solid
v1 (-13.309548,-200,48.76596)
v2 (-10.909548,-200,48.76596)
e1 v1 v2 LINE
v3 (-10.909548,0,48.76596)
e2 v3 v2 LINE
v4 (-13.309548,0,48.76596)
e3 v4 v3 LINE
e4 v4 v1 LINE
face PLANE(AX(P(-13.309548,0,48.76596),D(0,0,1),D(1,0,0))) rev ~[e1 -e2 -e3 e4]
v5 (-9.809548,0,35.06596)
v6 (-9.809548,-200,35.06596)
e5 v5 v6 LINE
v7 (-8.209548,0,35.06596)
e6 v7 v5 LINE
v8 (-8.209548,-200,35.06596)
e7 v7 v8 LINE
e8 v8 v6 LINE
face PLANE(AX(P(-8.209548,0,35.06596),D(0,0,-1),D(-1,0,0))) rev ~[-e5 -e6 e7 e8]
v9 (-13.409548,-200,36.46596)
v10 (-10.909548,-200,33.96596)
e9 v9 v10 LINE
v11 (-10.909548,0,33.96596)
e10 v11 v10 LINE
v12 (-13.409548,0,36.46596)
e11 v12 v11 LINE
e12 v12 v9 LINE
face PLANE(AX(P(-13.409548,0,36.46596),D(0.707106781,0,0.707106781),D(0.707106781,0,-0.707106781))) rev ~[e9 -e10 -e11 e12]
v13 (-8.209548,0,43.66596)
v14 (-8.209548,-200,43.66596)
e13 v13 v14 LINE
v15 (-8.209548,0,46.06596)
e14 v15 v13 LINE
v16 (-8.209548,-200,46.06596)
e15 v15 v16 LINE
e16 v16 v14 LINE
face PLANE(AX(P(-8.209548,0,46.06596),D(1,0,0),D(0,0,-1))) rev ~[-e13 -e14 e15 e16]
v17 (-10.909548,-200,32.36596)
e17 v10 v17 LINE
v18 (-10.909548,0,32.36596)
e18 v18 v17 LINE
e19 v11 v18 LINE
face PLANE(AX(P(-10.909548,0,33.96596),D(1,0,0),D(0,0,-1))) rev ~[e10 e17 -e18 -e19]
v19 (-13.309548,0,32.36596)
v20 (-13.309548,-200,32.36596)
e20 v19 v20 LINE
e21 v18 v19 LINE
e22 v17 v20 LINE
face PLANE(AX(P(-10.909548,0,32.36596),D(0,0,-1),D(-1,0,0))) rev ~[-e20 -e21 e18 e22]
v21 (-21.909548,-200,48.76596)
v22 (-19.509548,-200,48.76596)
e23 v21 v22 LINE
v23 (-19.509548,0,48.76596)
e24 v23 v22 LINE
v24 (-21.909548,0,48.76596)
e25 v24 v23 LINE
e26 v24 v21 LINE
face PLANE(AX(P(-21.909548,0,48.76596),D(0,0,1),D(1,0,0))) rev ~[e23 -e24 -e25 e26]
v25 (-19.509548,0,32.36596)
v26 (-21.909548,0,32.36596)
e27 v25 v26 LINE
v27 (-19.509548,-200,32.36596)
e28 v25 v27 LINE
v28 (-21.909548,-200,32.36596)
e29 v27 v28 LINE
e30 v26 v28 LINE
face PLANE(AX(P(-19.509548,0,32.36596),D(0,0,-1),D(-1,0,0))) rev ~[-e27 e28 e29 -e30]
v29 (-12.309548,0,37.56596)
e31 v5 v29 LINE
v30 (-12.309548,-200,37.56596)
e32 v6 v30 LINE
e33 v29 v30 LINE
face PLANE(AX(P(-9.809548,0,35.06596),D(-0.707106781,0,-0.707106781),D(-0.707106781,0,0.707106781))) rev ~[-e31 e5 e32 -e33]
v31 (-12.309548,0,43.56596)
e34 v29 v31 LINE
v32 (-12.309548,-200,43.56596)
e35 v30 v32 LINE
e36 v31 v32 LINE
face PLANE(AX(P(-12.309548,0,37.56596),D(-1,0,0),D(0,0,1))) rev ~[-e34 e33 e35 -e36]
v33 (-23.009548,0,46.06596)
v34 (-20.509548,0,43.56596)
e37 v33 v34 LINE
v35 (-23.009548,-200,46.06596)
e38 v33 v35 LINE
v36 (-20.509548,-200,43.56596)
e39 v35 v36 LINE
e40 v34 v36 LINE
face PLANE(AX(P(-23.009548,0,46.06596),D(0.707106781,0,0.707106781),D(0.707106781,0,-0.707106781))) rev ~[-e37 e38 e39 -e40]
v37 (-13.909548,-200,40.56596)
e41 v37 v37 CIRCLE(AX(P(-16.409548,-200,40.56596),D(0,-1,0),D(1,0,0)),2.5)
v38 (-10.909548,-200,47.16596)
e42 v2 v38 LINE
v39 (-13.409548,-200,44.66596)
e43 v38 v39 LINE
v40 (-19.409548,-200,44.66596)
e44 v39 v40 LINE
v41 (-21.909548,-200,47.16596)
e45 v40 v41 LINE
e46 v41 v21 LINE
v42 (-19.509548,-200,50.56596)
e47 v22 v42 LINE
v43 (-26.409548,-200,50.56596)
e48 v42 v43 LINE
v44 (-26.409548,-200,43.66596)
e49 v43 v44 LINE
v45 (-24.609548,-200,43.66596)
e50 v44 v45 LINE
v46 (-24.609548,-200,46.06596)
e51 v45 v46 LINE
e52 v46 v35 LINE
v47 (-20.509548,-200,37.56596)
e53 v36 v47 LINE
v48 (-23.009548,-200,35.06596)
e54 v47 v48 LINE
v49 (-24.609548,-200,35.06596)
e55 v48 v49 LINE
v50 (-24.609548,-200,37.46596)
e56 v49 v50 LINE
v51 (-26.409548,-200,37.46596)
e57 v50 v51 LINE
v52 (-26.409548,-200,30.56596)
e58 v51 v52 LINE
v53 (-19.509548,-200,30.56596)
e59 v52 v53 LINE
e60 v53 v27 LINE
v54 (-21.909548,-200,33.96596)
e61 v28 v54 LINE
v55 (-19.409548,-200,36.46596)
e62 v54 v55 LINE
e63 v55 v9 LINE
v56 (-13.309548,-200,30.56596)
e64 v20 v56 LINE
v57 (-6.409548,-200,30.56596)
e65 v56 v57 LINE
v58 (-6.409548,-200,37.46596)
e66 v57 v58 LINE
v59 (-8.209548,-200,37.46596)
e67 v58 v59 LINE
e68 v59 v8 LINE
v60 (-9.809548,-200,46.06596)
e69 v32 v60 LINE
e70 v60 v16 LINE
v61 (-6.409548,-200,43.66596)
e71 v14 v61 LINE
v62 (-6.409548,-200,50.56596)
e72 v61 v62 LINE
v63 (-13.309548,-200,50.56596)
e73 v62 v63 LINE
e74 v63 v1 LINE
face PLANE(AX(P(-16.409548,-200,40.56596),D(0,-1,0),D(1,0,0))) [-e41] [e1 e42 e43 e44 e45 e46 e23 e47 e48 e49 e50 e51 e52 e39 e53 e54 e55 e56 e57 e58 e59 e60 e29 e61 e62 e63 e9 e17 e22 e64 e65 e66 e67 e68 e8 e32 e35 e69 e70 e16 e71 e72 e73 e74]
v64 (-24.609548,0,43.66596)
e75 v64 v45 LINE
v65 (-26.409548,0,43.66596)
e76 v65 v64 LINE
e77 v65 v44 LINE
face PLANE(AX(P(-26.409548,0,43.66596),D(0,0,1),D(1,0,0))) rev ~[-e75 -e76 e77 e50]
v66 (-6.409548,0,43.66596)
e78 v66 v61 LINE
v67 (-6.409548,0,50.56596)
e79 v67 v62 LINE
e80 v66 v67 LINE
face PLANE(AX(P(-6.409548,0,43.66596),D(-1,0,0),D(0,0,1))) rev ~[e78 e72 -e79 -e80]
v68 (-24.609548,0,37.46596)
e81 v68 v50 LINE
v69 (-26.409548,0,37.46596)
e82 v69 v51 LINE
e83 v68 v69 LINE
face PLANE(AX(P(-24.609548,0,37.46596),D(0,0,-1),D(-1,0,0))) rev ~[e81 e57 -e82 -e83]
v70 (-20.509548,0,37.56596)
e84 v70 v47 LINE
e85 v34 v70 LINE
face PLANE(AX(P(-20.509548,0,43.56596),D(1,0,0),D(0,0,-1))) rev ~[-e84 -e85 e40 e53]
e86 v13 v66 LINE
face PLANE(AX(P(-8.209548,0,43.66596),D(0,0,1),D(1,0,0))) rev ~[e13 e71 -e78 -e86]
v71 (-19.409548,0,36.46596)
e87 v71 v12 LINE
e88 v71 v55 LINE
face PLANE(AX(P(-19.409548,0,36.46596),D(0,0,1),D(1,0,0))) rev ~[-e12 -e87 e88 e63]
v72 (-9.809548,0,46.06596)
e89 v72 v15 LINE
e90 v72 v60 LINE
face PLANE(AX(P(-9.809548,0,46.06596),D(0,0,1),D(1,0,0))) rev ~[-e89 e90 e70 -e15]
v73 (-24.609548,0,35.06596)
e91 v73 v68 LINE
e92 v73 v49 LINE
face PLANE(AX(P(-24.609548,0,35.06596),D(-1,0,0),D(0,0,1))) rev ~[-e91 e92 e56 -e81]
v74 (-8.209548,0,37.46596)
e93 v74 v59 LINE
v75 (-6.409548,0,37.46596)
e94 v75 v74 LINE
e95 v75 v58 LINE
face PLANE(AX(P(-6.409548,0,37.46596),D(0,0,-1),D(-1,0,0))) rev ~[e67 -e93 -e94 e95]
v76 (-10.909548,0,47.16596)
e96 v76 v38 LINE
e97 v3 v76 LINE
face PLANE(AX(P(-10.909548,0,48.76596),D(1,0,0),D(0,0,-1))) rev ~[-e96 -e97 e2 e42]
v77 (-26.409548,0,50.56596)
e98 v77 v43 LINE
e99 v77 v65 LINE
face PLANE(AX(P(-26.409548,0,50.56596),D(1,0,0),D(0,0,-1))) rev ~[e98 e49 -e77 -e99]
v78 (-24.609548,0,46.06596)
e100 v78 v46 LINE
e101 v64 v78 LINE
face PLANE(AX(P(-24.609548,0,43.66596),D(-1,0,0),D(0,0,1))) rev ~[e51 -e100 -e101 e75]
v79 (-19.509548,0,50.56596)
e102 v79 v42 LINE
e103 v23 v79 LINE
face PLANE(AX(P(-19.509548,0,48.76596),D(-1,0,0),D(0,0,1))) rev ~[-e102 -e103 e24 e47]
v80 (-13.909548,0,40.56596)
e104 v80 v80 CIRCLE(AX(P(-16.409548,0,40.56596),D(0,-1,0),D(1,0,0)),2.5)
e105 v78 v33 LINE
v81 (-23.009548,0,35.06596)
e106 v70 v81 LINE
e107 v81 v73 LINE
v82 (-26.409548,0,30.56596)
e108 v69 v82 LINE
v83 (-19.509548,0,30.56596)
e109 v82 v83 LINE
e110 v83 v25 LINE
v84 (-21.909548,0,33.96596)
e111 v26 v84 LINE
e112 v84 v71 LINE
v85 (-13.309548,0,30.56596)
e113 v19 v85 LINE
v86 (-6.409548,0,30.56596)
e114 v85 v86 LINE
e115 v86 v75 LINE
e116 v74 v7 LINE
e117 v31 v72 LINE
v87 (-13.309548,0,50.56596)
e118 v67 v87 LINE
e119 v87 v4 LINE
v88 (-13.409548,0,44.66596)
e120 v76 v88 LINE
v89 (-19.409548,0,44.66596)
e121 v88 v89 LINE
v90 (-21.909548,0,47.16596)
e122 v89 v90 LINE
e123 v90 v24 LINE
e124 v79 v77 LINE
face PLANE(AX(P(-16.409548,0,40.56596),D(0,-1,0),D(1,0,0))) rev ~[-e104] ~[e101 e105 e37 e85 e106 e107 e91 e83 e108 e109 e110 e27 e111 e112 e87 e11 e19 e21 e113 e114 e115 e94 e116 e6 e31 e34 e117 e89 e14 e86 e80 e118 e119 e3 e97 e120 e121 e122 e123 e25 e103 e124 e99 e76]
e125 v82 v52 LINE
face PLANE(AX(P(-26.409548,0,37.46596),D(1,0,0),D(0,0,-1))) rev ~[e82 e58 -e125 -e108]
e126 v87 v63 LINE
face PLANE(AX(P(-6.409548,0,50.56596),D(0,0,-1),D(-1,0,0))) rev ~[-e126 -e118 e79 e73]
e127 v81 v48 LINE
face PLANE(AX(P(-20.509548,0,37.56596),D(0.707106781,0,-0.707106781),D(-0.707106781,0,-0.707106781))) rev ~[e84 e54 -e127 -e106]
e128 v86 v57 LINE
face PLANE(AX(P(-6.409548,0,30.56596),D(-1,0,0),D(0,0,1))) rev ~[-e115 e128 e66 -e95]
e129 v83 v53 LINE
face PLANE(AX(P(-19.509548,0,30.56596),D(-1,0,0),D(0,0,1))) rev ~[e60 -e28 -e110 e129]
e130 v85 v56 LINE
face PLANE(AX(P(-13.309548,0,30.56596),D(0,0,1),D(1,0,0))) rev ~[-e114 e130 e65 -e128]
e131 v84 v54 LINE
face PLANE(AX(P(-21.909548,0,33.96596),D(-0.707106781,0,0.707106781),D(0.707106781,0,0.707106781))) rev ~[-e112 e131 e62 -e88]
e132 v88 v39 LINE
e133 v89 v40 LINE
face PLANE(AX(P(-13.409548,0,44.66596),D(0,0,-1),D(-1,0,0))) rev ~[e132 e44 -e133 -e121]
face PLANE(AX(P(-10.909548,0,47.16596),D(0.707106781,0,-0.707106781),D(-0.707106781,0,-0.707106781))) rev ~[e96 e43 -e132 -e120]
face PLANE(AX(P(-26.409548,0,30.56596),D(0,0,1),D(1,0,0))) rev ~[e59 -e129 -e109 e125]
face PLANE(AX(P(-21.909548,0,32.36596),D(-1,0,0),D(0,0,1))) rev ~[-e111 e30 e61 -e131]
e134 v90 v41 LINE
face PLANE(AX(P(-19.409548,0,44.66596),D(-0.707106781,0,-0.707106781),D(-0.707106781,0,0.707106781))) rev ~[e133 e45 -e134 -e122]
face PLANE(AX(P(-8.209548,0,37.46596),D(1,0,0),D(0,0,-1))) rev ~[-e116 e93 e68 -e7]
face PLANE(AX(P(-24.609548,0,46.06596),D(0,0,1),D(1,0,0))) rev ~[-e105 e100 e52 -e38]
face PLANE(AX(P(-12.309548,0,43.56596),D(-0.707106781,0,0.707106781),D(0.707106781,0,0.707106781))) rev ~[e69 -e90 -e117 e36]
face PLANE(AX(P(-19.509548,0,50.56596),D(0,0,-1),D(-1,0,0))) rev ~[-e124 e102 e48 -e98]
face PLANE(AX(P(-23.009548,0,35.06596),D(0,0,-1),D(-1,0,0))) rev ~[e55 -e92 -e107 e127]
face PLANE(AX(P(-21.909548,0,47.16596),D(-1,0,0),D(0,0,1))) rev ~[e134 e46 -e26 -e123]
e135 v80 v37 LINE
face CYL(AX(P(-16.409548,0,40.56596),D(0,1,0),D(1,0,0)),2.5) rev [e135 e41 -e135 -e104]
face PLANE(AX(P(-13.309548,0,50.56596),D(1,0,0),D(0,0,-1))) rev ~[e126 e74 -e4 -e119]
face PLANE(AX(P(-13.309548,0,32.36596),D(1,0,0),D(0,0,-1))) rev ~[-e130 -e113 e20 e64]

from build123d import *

# Parameters (mm, degrees)
F0_R     = 2.5
F1_DEPTH = 200


# Not quite as in the source:
# - a feature names something its author has since deleted; it is built from what else it names


with BuildPart() as f1:
    # F0 (on Front) → F1 (new body)
    with BuildSketch(Plane.XZ):
        Polygon((-19.5095479995, 50.5659601092), (-26.4095479995, 50.5659601092), (-26.4095479995, 43.6659601092), (-24.6095479995, 43.6659601092), (-24.6095479995, 46.0659601092), (-23.0095479995, 46.0659601092), (-20.5095479995, 43.5659601092), (-20.5095479995, 37.5659601092), (-23.0095479995, 35.0659601092), (-24.6095479995, 35.0659601092), (-24.6095479995, 37.4659601092), (-26.4095479995, 37.4659601092), (-26.4095479995, 30.5659601092), (-19.5095479995, 30.5659601092), (-19.5095479995, 32.3659601092), (-21.9095479995, 32.3659601092), (-21.9095479995, 33.9659601092), (-19.4095479995, 36.4659601092), (-16.4095479995, 36.4659601092), (-13.4095479995, 36.4659601092), (-10.9095479995, 33.9659601092), (-10.9095479995, 32.3659601092), (-13.3095479995, 32.3659601092), (-13.3095479995, 30.5659601092), (-6.4095479995, 30.5659601092), (-6.4095479995, 37.4659601092), (-8.2095479995, 37.4659601092), (-8.2095479995, 35.0659601092), (-9.8095479995, 35.0659601092), (-12.3095479995, 37.5659601092), (-12.3095479995, 43.5659601092), (-9.8095479995, 46.0659601092), (-8.2095479995, 46.0659601092), (-8.2095479995, 43.6659601092), (-6.4095479995, 43.6659601092), (-6.4095479995, 50.5659601092), (-13.3095479995, 50.5659601092), (-13.3095479995, 48.7659601092), (-10.9095479995, 48.7659601092), (-10.9095479995, 47.1659601092), (-13.4095479995, 44.6659601092), (-16.4095479995, 44.6659601092), (-19.4095479995, 44.6659601092), (-21.9095479995, 47.1659601092), (-21.9095479995, 48.7659601092), (-19.5095479995, 48.7659601092), align=None)
        with Locations((-16.4095479995, 40.5659601092)):
            Circle(F0_R, mode=Mode.SUBTRACT)
    extrude(amount=F1_DEPTH)


solid = f1.part
